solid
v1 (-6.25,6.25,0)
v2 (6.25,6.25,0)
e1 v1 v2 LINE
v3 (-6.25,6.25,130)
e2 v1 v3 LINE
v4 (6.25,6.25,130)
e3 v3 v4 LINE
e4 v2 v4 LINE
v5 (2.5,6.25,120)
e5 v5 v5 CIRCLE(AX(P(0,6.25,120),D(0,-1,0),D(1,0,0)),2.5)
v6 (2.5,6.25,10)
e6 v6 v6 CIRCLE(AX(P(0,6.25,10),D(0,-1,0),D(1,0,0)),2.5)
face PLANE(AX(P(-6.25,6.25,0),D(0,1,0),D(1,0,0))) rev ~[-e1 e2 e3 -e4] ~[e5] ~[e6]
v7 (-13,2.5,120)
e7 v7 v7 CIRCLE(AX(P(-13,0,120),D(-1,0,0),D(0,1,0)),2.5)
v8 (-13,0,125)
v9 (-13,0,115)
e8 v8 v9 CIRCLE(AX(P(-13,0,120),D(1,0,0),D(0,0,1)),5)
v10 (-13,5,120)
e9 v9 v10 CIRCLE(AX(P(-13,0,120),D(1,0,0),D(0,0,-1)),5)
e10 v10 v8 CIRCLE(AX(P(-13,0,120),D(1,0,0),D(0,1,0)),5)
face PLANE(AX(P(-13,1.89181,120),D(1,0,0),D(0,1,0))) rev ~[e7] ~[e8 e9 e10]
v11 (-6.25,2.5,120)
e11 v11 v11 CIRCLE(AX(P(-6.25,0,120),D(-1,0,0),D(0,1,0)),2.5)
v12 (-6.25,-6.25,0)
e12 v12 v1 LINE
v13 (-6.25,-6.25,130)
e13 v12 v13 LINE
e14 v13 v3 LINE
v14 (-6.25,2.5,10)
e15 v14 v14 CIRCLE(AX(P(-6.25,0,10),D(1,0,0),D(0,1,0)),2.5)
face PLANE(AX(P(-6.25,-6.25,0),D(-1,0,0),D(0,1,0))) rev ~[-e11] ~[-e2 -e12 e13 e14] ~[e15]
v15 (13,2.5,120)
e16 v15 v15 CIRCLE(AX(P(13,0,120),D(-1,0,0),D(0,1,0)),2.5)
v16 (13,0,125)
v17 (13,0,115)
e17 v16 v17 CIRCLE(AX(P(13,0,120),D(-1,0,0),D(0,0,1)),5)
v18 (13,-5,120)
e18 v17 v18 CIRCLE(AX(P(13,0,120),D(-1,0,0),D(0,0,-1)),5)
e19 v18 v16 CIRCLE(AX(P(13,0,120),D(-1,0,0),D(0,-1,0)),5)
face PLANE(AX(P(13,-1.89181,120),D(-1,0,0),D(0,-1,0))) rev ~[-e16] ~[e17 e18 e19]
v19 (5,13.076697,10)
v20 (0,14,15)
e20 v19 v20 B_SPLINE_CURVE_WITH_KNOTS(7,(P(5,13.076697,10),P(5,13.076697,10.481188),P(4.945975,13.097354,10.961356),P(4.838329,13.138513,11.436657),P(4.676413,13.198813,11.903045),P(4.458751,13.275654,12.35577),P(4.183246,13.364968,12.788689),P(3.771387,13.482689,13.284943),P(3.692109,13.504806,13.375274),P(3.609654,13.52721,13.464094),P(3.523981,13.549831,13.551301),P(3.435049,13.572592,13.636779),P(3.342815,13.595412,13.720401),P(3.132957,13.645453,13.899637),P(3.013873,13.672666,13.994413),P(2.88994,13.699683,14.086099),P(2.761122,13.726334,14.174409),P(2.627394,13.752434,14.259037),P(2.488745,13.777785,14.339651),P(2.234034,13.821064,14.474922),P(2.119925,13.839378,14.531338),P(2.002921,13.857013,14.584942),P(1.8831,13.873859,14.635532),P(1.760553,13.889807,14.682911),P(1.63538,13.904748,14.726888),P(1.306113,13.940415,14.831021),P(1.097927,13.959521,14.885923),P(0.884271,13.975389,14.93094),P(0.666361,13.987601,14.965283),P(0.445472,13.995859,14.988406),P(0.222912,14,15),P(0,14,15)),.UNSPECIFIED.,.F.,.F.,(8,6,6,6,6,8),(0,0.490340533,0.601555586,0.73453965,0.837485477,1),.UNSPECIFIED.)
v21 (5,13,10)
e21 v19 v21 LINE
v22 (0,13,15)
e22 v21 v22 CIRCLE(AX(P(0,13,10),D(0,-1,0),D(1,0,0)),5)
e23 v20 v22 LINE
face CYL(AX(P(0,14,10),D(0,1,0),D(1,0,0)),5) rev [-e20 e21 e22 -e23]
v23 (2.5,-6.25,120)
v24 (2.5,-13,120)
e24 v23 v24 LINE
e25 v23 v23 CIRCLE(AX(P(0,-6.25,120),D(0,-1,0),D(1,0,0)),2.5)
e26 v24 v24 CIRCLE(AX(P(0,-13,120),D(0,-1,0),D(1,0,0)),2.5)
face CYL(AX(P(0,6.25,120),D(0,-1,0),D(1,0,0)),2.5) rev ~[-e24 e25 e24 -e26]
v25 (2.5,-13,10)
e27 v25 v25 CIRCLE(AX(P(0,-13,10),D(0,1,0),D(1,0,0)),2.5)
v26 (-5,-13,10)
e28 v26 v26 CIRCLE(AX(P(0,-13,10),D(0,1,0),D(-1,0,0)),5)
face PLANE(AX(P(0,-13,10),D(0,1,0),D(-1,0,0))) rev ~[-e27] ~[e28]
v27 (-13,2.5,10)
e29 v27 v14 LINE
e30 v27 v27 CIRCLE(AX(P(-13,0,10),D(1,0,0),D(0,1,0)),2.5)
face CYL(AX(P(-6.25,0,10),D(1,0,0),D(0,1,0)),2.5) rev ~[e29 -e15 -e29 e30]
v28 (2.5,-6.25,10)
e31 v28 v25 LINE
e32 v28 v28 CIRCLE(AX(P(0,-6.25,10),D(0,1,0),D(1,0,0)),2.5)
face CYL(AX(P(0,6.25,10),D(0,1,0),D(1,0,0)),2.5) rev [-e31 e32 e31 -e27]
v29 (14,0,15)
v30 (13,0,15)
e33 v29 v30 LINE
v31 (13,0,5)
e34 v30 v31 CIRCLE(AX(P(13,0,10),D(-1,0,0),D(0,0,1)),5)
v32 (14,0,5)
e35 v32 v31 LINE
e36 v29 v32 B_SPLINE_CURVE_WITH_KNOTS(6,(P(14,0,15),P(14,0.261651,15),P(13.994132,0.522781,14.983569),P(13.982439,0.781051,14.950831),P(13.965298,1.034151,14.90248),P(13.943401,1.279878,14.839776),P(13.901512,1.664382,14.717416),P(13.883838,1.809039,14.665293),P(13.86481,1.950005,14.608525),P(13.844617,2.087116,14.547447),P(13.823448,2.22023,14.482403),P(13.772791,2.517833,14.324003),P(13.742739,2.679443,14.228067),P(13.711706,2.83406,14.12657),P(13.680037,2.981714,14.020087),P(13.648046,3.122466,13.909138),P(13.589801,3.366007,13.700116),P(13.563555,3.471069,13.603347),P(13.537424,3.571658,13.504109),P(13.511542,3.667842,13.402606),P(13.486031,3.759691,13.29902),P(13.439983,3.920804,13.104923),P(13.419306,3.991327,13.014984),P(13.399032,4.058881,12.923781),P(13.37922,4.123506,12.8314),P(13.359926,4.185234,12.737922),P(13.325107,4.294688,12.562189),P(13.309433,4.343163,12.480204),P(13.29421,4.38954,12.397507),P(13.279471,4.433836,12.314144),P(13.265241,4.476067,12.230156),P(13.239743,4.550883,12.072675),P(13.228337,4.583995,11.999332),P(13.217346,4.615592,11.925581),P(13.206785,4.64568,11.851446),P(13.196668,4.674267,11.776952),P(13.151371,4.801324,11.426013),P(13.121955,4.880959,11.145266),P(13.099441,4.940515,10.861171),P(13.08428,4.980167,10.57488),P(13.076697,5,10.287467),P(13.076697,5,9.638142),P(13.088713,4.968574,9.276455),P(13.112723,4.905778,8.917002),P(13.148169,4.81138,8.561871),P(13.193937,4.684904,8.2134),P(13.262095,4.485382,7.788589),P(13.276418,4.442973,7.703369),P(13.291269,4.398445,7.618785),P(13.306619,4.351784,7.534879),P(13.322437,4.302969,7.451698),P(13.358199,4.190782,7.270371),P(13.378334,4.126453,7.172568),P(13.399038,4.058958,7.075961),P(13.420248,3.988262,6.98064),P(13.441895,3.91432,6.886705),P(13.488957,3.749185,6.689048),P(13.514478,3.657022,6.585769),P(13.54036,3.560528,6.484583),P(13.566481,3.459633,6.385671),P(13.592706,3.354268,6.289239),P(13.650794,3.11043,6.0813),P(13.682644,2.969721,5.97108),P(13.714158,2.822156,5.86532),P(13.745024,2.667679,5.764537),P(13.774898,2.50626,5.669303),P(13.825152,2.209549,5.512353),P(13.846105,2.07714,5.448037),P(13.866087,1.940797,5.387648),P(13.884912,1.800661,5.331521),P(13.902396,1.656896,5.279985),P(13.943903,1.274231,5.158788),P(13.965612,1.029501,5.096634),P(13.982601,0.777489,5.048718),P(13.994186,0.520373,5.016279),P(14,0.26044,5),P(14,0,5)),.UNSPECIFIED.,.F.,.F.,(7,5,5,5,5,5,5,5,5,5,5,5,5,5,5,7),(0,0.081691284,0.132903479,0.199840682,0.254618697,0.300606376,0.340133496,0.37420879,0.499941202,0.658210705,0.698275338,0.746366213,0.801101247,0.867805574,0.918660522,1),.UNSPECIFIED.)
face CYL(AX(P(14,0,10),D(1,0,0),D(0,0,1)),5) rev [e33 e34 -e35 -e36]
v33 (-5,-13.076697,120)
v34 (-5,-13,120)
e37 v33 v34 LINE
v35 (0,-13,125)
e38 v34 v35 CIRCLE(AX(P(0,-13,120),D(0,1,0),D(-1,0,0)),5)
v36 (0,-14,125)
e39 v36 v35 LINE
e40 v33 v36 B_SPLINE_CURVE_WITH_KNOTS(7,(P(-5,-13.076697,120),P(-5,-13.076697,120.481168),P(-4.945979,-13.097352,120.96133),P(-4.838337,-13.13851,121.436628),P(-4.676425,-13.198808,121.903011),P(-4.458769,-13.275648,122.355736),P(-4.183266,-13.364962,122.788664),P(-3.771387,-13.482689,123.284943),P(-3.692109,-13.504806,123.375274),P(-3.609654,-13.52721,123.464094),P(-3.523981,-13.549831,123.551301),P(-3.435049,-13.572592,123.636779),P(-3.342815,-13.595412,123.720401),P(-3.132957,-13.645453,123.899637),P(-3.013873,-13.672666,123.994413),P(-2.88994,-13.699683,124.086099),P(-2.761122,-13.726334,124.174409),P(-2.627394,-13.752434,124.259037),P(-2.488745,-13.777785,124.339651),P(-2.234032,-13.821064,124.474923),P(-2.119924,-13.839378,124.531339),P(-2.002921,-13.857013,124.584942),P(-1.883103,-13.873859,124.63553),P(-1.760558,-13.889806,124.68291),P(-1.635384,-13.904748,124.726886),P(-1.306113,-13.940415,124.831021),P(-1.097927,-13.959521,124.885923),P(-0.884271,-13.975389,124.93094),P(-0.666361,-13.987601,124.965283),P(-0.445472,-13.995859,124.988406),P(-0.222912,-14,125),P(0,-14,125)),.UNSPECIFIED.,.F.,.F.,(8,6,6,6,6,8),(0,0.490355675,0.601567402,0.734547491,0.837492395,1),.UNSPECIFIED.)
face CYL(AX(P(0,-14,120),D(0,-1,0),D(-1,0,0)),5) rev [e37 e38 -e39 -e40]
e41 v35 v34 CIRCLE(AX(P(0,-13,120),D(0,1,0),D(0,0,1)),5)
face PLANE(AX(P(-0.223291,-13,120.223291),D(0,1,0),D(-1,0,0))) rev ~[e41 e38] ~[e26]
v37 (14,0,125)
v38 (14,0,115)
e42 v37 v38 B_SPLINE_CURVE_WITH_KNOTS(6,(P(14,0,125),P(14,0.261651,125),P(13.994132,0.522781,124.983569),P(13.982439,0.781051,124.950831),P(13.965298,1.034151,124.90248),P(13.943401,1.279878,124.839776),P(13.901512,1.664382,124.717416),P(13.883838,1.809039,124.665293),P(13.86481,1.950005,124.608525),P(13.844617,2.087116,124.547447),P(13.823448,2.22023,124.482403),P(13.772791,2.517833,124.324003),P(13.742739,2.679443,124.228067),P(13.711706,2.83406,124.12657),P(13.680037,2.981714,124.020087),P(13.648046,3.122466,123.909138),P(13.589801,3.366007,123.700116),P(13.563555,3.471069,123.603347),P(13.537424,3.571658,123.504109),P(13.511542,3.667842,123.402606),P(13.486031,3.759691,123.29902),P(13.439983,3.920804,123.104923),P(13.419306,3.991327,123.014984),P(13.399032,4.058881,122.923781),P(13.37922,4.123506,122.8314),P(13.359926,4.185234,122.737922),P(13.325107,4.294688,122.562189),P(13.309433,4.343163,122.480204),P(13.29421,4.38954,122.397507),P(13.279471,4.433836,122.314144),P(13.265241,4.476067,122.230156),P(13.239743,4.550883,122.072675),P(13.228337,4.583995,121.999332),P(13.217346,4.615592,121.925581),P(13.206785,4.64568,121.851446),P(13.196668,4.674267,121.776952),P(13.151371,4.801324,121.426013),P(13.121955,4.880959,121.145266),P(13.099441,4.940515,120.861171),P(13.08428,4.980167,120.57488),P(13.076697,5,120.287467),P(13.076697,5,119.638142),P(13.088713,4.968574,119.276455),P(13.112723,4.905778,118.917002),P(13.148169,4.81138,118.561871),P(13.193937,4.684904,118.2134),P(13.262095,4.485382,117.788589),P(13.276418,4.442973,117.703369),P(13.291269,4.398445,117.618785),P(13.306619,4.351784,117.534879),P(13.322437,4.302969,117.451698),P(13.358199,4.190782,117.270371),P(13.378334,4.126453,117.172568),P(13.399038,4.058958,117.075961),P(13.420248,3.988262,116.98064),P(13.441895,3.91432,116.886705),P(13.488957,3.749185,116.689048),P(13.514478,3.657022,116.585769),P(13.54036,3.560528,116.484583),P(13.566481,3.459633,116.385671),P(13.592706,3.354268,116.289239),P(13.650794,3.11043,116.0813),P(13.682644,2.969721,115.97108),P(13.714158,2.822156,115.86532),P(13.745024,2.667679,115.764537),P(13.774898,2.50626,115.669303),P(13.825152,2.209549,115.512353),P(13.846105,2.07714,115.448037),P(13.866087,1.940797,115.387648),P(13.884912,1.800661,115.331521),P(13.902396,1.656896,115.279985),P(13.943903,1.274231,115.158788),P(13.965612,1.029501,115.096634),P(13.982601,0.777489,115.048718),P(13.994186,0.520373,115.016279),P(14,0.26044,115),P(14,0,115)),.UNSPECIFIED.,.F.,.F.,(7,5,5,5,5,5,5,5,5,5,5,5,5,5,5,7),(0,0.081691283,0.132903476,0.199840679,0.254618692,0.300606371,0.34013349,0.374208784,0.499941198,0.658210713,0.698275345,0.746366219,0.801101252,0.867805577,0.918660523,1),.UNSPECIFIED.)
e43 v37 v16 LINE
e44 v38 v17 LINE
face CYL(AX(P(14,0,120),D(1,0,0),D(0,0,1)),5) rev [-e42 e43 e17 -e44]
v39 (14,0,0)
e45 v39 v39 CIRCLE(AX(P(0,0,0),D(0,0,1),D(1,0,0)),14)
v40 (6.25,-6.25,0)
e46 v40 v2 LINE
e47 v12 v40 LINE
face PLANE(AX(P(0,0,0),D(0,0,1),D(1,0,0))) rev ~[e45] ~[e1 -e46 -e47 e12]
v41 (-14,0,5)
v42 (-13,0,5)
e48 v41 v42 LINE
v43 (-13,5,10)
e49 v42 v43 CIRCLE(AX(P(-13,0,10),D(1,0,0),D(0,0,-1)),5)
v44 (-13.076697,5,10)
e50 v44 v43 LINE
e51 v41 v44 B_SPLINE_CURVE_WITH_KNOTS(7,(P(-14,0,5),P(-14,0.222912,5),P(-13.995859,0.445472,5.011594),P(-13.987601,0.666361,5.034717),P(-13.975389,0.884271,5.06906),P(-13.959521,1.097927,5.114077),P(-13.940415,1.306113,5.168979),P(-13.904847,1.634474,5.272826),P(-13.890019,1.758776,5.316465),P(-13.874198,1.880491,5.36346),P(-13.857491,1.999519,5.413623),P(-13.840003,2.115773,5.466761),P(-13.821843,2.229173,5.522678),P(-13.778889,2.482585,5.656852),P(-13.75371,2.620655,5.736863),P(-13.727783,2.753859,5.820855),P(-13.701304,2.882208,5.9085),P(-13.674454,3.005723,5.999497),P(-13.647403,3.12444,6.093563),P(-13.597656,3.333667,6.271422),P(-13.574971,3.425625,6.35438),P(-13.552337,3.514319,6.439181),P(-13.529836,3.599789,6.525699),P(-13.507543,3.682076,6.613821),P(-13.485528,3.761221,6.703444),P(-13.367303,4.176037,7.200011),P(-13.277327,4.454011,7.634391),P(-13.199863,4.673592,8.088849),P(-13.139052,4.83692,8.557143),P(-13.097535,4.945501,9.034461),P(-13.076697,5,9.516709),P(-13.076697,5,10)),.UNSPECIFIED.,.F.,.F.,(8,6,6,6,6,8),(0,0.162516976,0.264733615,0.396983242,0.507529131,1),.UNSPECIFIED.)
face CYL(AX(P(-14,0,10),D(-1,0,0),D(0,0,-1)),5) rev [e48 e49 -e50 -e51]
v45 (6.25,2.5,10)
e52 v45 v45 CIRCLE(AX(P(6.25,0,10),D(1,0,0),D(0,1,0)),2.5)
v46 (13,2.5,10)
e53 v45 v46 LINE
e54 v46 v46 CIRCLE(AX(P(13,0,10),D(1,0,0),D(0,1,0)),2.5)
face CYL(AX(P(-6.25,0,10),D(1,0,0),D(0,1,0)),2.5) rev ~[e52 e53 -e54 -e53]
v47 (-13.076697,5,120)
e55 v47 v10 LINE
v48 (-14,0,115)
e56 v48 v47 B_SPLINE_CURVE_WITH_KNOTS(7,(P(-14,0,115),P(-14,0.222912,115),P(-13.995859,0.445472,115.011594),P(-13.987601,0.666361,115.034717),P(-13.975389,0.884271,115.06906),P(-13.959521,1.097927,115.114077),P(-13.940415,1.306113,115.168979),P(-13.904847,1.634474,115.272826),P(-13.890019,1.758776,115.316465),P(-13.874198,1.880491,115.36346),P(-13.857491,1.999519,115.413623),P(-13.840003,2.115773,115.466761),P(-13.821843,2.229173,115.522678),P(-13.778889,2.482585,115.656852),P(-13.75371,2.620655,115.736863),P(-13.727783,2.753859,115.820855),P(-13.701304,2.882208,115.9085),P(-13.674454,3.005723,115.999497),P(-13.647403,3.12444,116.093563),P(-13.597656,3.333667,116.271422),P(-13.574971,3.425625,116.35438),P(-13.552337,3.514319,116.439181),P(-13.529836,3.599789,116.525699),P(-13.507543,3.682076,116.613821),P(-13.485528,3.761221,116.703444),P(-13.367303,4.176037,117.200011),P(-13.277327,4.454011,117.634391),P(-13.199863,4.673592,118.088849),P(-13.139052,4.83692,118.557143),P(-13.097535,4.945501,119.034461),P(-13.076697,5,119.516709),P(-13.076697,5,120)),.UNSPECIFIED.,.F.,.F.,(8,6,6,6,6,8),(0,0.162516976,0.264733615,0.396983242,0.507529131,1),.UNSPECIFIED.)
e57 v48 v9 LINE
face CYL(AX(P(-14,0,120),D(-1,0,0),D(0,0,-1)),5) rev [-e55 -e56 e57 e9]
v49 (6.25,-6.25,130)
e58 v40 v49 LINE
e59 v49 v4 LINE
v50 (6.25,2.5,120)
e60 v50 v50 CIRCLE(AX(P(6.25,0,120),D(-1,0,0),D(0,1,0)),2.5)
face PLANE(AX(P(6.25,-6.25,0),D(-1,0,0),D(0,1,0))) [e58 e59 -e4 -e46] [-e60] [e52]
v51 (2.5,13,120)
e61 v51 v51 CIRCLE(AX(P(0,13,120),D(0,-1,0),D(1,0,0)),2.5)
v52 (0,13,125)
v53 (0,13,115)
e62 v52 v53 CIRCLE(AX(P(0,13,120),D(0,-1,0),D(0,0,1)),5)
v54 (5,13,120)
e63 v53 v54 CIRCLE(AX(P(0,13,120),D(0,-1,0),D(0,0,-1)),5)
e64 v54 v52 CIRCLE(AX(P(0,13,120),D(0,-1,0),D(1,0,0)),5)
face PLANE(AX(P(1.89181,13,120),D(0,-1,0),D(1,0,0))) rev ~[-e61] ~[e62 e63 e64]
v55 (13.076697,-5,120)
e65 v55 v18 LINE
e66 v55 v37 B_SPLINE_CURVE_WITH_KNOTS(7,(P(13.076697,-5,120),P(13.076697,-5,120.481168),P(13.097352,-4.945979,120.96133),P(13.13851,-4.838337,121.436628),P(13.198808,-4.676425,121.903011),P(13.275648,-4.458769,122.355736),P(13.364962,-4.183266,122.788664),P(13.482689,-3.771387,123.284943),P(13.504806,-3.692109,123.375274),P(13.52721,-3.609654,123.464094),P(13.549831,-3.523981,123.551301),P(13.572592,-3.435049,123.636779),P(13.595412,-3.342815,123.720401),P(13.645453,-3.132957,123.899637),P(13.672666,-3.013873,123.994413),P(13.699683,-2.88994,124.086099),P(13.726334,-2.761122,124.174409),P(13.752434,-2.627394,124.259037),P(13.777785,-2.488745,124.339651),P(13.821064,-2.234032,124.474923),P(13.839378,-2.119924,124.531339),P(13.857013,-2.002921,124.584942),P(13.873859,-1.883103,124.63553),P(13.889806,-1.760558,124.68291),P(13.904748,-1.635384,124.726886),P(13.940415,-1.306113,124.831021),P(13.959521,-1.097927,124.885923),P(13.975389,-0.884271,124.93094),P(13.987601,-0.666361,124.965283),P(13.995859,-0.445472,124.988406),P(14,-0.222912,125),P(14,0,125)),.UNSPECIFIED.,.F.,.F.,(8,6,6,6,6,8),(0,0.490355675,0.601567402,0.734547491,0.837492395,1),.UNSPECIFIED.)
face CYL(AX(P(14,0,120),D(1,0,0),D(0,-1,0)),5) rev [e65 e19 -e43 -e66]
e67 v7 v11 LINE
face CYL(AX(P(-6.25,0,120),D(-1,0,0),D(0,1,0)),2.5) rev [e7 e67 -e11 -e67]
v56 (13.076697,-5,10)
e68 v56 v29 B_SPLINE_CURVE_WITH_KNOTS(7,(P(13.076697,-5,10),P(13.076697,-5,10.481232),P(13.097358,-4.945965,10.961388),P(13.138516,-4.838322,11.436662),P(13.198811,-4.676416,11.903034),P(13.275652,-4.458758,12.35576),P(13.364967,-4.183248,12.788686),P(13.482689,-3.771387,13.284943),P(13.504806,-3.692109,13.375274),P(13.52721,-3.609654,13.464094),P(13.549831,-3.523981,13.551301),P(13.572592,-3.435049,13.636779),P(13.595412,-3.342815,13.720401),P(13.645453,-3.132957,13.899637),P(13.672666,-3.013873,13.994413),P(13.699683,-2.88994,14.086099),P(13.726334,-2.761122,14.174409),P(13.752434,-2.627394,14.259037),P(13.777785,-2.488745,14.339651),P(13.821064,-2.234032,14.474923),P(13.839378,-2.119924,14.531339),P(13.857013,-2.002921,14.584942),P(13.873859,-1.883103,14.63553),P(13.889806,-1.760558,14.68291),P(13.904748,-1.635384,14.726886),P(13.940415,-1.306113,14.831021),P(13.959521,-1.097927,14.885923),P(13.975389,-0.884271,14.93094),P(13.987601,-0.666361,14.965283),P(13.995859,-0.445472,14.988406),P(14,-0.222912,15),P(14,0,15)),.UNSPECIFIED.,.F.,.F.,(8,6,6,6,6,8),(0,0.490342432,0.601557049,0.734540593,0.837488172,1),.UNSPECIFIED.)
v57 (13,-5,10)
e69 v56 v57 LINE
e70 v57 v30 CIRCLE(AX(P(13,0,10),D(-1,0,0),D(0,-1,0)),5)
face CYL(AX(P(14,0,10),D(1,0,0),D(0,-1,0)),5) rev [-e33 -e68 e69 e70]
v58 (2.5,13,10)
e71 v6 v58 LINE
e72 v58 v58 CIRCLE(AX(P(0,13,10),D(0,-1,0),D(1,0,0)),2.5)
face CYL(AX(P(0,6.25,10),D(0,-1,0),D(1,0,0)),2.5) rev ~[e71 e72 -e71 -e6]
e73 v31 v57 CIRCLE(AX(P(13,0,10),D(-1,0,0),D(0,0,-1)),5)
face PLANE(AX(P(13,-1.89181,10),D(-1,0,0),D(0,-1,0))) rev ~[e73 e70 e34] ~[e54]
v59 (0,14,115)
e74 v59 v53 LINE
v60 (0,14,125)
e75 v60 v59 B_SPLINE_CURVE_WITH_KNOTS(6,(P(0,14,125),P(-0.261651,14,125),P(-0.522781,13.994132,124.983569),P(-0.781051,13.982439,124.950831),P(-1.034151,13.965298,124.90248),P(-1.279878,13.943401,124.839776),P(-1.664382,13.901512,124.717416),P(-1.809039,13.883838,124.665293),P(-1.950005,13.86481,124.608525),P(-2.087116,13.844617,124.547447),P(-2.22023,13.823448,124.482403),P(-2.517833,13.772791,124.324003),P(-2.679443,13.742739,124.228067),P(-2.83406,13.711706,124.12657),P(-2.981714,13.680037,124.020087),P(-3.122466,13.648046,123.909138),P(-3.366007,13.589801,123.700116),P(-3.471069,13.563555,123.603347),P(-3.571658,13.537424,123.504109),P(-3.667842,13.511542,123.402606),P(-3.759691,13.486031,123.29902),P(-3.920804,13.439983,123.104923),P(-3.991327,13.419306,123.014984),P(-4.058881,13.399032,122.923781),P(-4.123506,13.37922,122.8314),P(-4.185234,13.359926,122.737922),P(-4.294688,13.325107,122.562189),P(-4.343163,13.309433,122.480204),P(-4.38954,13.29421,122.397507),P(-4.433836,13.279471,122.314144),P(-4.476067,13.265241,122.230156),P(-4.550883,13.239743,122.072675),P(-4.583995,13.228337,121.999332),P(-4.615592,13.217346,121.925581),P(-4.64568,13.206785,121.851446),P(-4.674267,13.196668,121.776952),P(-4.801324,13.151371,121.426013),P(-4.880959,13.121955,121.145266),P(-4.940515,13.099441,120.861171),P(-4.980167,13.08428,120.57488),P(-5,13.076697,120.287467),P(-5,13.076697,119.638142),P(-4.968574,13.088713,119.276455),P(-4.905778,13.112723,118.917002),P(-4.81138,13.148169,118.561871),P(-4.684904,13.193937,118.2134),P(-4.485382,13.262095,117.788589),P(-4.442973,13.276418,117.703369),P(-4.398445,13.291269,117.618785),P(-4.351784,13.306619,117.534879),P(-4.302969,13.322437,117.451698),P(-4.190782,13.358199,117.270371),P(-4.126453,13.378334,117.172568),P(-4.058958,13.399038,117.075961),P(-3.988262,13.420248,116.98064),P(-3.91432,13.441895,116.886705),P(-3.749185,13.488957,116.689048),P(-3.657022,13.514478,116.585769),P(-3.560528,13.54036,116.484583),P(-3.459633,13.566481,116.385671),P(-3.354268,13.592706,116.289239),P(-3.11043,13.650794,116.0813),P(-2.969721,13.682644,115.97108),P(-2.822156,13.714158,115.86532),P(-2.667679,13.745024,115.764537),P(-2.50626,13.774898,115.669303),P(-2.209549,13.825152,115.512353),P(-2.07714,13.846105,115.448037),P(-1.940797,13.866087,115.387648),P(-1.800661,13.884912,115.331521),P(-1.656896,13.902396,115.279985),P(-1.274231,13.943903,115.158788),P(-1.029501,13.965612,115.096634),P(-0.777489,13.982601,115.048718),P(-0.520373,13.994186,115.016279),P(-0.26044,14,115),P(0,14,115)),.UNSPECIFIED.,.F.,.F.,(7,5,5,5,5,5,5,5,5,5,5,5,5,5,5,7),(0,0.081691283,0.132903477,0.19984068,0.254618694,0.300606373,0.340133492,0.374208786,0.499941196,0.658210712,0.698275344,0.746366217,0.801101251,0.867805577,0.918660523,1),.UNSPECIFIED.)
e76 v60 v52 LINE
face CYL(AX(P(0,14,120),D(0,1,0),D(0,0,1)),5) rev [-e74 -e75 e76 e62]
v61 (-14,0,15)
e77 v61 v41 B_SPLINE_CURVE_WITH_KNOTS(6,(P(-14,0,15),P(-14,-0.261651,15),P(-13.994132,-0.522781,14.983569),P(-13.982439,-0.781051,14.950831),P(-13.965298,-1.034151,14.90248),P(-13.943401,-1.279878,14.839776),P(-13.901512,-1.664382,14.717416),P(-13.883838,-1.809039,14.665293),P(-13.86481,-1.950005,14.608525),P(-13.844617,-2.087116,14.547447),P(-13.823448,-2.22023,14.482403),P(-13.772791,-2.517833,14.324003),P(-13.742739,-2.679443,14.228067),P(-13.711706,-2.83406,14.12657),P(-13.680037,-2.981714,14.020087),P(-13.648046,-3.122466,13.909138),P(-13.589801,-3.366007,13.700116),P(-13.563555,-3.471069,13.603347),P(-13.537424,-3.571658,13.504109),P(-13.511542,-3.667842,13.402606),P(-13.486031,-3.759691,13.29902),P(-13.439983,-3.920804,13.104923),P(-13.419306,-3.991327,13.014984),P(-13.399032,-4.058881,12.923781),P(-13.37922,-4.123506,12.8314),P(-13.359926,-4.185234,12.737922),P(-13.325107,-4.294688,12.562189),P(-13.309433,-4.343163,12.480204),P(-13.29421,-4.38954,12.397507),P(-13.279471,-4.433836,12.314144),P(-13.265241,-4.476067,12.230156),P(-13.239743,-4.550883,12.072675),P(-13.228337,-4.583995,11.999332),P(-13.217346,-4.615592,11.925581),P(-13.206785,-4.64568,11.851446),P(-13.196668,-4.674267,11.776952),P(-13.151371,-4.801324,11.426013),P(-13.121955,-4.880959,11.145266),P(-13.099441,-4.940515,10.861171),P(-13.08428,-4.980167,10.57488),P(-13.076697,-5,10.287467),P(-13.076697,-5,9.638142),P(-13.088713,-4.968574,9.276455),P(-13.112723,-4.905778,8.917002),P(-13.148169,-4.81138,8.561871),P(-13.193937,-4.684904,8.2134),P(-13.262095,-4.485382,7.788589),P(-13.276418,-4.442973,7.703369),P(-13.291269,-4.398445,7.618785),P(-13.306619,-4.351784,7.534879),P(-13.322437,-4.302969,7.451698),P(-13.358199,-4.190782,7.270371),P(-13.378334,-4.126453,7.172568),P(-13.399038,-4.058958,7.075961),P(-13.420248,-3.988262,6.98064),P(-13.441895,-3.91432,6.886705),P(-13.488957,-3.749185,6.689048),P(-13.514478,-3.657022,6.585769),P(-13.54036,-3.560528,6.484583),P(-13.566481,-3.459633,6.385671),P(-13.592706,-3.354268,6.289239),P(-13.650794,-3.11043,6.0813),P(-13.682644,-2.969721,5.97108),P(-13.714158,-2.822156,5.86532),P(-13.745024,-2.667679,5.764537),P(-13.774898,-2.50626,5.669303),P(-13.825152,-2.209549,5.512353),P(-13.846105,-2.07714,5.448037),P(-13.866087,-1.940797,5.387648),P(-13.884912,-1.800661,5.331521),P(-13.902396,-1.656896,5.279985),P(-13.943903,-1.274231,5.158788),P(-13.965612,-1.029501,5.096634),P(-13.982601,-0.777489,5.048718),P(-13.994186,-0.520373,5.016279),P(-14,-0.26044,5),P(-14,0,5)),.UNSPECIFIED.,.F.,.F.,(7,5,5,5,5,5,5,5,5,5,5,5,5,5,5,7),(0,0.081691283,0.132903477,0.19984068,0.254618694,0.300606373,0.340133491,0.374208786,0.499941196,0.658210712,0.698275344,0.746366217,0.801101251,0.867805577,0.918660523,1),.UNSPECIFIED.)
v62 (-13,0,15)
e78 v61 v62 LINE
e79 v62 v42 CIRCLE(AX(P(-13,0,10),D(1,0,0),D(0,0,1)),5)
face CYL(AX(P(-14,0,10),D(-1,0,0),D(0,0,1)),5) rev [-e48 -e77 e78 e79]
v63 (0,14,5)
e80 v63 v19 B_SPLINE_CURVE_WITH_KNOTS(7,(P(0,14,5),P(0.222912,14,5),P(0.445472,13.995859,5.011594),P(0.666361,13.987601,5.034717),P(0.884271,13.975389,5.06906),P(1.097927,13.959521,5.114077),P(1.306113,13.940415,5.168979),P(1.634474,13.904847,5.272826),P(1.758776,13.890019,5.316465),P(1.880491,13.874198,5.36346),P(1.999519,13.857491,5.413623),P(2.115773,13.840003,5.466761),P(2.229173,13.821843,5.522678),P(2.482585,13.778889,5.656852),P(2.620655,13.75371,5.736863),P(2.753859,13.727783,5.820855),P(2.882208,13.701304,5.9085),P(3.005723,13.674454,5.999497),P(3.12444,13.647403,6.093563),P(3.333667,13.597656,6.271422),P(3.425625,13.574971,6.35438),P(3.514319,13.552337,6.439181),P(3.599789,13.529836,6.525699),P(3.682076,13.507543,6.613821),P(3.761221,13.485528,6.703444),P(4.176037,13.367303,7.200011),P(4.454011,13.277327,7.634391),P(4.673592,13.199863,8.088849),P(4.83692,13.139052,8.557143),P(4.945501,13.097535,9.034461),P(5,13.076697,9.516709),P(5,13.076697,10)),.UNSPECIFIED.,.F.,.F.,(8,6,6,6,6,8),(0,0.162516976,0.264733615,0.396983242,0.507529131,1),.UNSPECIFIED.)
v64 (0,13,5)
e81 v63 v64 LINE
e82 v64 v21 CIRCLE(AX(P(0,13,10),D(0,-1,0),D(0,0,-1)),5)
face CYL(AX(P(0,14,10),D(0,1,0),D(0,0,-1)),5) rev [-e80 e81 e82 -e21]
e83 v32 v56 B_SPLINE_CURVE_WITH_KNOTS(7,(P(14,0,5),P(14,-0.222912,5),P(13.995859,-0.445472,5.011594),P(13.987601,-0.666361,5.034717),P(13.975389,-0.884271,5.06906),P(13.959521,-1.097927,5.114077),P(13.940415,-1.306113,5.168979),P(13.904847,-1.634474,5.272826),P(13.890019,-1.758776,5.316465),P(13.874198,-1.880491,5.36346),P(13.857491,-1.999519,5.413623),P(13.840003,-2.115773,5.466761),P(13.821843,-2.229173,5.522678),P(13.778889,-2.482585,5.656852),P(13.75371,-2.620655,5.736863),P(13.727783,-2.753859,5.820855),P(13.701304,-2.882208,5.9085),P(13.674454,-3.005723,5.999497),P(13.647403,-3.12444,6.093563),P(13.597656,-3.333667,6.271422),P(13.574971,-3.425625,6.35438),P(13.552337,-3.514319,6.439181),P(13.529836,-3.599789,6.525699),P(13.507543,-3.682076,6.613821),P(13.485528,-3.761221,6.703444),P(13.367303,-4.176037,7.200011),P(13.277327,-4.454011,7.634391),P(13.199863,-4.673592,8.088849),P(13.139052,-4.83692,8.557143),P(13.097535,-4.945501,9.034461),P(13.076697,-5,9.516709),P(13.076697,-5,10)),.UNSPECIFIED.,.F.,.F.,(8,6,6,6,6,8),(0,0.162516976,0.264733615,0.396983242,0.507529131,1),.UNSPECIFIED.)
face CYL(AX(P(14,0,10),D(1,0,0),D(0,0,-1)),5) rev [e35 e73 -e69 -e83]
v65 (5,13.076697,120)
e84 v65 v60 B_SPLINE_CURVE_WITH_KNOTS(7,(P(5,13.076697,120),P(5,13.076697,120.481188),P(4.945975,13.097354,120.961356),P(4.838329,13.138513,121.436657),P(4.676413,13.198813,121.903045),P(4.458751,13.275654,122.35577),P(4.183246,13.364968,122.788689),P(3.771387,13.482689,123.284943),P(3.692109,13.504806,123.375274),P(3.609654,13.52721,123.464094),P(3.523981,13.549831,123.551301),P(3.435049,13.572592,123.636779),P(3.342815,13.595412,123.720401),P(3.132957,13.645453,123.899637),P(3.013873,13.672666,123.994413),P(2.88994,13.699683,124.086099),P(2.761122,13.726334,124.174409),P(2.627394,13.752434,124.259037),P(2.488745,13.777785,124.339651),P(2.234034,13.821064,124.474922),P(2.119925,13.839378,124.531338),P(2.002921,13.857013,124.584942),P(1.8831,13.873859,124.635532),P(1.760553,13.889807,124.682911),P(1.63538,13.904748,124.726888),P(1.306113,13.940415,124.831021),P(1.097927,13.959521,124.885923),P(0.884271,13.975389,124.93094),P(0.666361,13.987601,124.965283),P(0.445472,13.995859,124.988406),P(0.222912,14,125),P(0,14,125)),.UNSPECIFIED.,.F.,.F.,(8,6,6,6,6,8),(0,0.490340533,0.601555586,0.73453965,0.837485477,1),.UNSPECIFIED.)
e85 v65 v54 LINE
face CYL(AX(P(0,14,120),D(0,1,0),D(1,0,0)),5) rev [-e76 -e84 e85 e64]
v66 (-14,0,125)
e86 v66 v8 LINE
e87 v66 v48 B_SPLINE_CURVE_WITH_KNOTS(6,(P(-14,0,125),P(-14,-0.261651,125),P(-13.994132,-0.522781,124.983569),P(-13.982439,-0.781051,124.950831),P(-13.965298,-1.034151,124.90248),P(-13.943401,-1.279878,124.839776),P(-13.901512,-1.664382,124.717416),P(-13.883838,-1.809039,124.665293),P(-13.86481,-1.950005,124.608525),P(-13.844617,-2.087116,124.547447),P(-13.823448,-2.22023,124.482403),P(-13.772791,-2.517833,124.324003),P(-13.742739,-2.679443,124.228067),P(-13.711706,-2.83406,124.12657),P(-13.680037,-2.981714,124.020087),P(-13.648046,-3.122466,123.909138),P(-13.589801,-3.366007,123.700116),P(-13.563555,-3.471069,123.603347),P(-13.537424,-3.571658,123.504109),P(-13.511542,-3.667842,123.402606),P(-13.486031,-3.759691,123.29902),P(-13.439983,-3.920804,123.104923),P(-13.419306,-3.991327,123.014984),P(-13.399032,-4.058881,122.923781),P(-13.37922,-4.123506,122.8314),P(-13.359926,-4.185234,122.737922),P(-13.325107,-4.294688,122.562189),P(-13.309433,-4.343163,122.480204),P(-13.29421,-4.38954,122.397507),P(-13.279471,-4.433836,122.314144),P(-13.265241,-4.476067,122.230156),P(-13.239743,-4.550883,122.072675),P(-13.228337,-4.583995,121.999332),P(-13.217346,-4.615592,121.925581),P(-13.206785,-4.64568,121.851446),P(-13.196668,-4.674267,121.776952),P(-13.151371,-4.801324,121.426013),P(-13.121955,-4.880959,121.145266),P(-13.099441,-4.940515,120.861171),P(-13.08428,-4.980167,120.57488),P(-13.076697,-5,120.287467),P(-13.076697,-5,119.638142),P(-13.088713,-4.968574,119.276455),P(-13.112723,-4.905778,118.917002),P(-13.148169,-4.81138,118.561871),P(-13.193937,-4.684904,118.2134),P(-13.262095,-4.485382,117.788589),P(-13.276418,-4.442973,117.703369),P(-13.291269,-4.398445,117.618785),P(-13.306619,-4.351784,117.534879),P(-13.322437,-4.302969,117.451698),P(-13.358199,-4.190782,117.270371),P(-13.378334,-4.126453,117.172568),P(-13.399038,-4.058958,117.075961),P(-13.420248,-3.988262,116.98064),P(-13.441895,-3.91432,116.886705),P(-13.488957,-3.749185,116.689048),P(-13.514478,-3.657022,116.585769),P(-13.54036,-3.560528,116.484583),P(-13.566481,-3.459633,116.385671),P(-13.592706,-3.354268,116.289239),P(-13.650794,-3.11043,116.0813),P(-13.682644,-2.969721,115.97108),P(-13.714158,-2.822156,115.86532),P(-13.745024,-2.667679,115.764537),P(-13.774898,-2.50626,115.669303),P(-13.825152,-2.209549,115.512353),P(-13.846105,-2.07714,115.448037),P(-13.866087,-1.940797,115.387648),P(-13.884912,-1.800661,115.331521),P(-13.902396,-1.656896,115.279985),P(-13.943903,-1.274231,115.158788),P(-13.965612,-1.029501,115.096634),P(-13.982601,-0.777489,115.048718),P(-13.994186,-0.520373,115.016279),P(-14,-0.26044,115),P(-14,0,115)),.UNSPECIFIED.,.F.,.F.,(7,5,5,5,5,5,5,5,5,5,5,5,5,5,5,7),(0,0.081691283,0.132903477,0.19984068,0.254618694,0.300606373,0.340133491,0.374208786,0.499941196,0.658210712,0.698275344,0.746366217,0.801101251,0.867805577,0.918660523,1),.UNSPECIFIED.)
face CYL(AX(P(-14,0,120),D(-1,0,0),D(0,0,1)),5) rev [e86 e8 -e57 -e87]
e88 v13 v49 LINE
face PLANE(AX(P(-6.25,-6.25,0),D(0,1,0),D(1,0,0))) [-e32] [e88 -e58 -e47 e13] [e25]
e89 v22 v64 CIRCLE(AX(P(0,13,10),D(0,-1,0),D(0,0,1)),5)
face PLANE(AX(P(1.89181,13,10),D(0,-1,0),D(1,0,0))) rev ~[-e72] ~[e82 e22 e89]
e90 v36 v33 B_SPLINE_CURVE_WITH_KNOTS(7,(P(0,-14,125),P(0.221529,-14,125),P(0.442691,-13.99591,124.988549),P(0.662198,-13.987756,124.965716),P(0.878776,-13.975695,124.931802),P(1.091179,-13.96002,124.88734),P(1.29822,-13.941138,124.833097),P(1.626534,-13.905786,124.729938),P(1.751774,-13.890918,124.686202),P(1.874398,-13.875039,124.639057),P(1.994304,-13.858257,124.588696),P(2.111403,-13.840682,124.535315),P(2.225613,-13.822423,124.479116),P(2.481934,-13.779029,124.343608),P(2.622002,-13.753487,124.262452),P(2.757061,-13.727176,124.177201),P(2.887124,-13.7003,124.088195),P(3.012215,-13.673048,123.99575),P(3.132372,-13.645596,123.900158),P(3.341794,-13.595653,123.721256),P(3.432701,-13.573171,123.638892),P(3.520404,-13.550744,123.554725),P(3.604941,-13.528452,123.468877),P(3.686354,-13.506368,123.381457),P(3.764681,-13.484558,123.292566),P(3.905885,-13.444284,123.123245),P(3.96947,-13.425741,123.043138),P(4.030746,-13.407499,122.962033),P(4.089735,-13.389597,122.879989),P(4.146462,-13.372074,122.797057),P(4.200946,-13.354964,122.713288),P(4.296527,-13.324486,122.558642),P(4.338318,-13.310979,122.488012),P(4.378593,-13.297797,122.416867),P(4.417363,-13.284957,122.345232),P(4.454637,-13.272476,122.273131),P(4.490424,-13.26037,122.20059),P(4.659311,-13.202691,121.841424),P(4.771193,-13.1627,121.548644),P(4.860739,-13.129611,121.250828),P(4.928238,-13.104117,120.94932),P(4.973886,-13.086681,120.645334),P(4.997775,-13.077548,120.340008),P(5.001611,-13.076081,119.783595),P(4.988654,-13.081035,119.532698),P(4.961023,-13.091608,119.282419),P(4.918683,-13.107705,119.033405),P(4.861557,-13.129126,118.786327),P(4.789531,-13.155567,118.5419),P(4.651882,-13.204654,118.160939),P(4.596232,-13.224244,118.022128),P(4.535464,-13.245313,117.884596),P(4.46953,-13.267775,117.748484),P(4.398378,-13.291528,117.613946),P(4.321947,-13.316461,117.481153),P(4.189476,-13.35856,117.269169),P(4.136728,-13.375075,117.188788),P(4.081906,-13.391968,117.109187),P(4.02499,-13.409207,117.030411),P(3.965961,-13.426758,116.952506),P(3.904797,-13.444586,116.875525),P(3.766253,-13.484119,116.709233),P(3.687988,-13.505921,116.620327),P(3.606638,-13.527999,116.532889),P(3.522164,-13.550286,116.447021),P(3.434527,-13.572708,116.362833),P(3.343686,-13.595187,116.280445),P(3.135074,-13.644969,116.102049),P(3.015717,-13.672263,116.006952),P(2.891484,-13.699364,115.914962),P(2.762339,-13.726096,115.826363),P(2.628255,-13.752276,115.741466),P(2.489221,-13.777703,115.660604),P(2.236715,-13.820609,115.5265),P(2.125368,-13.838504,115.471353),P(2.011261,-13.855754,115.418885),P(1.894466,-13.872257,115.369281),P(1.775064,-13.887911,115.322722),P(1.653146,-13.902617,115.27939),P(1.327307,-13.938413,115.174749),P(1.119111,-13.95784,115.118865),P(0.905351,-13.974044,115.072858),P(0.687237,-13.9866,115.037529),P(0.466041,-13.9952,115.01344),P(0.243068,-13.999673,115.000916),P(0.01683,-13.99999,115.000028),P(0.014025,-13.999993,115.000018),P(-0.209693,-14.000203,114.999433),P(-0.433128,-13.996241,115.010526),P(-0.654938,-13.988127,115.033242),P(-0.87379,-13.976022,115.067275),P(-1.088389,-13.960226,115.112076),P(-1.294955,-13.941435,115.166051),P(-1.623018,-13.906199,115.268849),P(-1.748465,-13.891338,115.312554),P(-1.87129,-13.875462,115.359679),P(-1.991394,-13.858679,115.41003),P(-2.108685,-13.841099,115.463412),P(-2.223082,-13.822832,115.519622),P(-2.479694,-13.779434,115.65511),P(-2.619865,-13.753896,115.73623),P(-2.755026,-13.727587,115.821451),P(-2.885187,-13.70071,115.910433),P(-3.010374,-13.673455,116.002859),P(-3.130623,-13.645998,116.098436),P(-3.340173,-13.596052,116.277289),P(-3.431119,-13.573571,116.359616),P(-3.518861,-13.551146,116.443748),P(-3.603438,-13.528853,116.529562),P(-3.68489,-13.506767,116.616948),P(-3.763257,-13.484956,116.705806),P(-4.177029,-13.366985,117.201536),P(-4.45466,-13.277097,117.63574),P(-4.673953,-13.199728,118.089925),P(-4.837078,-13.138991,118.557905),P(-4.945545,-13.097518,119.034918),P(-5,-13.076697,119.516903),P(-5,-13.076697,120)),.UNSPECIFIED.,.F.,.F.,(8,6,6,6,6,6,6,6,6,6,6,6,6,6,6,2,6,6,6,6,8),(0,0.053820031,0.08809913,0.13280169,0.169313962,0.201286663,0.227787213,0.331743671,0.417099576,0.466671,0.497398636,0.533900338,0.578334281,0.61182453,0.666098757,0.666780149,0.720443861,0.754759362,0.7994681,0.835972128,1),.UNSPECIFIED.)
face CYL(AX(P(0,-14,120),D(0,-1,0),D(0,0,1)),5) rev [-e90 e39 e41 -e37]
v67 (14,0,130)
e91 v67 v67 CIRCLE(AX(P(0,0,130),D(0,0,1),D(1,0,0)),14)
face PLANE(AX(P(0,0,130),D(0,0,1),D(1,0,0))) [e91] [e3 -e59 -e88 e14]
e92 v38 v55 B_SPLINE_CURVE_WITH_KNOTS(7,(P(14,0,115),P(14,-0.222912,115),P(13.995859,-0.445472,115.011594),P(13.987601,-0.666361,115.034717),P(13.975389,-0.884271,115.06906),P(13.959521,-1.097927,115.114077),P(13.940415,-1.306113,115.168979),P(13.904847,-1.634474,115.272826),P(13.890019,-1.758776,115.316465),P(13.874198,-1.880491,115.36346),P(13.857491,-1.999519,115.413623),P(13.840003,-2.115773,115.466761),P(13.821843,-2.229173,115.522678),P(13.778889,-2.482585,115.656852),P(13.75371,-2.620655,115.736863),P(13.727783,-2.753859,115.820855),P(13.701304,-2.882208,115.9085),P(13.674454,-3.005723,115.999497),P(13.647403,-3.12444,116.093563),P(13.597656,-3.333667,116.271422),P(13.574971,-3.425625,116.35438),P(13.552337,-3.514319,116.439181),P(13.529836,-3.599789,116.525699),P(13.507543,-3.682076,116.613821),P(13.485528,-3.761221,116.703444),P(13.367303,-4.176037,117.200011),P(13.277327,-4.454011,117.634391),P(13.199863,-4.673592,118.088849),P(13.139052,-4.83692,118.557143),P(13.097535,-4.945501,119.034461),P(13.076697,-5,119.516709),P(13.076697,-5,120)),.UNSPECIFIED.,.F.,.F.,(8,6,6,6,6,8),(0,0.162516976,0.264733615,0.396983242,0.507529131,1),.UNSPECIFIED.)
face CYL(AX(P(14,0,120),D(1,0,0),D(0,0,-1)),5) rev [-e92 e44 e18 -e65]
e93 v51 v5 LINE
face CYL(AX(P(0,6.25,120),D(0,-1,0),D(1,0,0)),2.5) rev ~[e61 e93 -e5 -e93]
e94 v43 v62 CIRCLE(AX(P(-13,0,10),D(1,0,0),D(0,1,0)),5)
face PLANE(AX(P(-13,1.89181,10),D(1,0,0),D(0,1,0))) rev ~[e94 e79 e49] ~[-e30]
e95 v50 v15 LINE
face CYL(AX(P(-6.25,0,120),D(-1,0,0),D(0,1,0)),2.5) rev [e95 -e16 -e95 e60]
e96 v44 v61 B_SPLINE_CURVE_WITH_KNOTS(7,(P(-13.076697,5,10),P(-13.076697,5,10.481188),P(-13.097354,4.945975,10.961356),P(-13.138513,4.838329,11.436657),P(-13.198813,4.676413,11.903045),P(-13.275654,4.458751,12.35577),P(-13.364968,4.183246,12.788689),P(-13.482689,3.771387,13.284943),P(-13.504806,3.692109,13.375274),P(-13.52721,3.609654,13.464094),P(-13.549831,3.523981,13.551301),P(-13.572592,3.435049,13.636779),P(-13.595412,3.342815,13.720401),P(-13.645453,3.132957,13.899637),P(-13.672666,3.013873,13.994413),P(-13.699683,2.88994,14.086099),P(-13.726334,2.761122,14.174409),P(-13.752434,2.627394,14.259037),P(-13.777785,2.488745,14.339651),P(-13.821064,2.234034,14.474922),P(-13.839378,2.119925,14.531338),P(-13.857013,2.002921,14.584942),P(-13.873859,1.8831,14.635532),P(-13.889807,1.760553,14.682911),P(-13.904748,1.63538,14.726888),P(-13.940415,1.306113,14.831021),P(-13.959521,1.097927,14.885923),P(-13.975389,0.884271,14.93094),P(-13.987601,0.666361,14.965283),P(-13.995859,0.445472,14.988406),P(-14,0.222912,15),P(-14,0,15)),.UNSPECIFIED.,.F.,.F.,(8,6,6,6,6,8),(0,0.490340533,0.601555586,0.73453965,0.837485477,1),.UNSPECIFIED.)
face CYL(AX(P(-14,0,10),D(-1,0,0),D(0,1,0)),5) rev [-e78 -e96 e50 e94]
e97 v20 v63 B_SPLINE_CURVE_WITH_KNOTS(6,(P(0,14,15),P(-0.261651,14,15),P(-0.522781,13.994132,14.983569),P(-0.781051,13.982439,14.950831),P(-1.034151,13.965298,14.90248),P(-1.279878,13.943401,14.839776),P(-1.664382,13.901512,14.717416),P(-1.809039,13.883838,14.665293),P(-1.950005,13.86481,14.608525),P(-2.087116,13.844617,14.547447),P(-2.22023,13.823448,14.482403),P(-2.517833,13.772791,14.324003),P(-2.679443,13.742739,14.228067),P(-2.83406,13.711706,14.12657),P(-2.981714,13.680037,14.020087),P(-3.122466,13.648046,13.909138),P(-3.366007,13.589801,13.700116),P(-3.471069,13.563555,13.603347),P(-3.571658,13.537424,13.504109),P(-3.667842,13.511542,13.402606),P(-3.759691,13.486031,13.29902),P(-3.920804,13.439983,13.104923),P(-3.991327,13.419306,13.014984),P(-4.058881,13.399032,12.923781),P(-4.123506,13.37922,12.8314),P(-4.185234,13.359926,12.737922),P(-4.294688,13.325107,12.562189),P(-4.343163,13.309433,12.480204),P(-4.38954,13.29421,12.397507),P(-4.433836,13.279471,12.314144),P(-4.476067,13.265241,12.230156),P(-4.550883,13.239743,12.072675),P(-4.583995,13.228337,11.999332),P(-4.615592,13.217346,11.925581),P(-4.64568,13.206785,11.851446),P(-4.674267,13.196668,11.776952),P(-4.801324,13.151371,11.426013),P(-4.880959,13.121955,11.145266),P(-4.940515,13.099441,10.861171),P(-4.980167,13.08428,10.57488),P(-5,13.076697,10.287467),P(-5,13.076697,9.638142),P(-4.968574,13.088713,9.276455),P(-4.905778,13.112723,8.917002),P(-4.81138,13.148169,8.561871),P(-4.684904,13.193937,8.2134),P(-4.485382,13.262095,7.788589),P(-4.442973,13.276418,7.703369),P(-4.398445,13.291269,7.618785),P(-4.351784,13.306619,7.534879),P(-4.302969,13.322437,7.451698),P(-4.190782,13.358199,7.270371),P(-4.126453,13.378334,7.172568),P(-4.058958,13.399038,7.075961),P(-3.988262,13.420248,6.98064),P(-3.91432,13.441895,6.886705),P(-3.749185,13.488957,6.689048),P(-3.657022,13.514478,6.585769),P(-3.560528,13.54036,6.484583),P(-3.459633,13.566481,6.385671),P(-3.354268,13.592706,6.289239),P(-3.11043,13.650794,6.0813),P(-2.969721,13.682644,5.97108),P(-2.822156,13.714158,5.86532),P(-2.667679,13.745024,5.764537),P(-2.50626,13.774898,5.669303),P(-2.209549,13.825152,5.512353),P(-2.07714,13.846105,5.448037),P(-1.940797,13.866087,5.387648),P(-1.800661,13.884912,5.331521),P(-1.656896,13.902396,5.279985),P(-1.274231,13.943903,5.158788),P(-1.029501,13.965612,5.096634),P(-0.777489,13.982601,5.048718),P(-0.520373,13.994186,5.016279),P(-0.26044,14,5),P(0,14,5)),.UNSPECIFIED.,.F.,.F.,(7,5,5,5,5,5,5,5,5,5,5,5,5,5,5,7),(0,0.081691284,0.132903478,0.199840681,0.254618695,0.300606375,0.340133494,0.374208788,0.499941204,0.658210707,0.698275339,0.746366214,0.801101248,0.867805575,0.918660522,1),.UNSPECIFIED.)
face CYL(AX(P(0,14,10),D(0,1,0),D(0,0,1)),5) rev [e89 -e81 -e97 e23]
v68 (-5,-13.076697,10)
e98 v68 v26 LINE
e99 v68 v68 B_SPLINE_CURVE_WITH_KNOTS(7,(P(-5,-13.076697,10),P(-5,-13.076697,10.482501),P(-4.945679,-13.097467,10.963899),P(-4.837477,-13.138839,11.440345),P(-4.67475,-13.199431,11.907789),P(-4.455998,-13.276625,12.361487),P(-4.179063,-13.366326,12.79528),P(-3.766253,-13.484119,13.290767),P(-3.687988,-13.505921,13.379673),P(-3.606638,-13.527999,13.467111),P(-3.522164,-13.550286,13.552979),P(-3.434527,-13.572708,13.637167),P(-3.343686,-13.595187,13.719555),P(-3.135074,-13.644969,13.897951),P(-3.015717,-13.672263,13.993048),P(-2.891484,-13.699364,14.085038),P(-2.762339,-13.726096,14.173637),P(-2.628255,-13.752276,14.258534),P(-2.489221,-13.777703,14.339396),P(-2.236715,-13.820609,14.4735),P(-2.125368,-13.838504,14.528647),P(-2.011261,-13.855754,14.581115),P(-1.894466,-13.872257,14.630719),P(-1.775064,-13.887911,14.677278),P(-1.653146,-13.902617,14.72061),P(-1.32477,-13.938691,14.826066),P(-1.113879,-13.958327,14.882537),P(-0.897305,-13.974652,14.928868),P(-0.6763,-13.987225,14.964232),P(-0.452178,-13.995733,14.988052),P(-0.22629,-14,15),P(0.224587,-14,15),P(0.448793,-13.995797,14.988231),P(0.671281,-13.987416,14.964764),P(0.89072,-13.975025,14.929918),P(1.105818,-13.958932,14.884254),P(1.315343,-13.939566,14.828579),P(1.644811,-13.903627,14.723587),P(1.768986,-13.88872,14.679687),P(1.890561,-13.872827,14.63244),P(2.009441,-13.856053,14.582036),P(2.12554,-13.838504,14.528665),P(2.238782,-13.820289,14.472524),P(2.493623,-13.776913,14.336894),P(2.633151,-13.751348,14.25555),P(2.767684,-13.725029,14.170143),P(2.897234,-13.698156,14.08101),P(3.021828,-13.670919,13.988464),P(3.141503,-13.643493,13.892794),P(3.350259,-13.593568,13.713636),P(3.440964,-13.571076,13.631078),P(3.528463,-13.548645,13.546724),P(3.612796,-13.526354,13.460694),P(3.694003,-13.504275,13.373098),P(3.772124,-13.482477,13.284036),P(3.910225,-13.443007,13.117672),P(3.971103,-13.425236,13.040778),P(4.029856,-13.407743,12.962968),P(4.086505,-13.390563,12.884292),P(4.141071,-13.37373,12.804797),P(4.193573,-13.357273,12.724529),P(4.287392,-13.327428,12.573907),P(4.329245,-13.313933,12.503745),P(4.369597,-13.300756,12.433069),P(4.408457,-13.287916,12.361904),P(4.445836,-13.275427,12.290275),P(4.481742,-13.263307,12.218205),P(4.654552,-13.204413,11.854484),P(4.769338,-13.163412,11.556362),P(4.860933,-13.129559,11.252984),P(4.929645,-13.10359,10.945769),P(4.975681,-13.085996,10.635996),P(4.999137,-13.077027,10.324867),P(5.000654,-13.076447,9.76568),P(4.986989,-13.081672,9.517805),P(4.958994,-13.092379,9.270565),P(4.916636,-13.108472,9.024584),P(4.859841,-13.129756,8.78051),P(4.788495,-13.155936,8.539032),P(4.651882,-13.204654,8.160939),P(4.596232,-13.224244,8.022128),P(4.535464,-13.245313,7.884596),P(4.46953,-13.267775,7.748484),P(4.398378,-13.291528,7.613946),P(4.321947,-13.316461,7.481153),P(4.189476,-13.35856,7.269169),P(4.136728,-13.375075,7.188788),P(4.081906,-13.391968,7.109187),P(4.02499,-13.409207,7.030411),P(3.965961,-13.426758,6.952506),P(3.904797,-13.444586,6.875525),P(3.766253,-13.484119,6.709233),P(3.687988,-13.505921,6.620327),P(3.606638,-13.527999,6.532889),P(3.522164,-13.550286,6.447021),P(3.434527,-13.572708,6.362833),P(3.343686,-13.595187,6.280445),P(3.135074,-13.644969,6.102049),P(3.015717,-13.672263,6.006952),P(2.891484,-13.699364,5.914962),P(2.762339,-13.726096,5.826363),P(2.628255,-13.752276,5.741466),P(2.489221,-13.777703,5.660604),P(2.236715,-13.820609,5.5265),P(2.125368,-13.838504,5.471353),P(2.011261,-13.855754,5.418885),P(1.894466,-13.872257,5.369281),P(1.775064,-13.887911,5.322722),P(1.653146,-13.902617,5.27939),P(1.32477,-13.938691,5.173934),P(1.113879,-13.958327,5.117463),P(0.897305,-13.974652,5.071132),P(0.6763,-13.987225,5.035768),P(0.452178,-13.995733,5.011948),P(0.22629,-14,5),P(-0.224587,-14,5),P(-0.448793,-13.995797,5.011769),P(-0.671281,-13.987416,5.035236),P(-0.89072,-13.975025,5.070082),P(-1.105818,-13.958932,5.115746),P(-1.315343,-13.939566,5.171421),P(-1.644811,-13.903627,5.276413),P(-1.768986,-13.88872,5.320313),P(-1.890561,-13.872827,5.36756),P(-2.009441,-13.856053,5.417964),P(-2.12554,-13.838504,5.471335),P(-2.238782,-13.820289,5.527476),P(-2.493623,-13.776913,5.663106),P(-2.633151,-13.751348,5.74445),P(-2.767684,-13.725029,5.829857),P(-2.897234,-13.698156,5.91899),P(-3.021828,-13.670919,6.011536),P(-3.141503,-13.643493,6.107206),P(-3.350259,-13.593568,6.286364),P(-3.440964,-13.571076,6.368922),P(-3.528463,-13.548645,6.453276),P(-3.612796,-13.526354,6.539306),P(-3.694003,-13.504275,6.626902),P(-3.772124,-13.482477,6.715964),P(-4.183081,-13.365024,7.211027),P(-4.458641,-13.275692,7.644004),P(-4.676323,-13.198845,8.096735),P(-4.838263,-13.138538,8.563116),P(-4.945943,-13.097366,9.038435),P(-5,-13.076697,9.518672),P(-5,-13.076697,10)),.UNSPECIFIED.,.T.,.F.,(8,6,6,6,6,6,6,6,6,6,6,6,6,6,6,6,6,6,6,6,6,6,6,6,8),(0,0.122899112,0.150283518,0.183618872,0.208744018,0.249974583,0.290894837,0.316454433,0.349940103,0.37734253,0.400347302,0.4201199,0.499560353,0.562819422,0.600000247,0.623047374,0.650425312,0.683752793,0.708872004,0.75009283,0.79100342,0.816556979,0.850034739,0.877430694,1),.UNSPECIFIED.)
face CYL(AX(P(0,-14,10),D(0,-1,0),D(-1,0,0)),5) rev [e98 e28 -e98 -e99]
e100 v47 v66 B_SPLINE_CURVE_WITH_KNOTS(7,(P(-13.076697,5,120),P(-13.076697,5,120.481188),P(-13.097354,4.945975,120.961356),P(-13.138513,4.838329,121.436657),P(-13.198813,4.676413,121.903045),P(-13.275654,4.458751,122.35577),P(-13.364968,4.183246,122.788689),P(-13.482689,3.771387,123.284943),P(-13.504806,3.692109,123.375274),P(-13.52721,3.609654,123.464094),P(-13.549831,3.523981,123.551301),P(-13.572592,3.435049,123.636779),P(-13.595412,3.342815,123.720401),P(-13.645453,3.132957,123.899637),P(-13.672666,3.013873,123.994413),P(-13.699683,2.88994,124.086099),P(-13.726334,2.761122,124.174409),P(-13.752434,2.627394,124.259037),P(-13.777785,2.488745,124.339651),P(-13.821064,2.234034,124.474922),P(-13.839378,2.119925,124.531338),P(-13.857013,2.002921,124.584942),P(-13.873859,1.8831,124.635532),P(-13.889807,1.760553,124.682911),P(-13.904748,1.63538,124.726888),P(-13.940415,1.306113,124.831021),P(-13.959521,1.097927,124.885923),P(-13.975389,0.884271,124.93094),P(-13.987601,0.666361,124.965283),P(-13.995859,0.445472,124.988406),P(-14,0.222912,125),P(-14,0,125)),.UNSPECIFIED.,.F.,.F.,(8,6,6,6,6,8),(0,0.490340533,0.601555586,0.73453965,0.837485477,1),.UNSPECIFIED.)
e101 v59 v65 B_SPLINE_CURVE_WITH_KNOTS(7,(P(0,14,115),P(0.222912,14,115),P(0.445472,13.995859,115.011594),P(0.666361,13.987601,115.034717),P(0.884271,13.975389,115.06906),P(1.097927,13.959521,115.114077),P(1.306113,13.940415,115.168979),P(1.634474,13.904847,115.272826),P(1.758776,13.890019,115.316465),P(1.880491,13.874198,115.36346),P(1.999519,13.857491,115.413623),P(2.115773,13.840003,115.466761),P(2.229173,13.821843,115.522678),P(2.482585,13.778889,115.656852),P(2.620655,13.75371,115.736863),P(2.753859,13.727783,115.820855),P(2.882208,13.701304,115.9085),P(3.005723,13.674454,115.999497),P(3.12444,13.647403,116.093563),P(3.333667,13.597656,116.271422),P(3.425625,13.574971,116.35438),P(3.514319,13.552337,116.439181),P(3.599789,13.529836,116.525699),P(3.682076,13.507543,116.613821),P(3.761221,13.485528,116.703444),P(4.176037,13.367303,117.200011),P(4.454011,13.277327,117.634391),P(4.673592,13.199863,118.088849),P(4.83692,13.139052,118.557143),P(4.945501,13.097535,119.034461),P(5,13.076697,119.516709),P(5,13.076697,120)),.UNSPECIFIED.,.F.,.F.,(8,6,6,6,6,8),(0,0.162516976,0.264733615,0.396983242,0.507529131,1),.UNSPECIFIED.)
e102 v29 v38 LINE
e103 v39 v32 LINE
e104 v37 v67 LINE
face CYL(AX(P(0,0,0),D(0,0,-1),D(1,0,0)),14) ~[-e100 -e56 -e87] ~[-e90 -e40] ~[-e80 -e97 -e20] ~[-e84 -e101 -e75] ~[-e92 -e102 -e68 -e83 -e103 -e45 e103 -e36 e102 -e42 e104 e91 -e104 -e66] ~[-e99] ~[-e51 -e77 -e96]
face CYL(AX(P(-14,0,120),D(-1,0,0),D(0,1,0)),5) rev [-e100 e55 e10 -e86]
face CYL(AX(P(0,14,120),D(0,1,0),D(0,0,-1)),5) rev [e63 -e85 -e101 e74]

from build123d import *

# Parameters (mm, degrees)
F0_R            = 14
F0_W            = 12.5
F0_H            = 12.5
F1_DEPTH        = 130
F2_R            = 2.5
F4_DEPTH        = 25
F3_R            = 2.5
F5_DEPTH        = 25
F9_DEPTH        = 1
F9_COPIES_COUNT = 3
F9_COPIES_ANGLE = 180
F12_R           = 5
F13_DEPTH       = 1


# Not quite as in the source:
# - a pattern or mirror of a feature is missing from the dataset's text; its kind, count and spacing are read off the source's solid


with BuildPart() as f1:
    # F0 (on Top) → F1 (new body)
    with BuildSketch(Plane.XY):
        Circle(F0_R)
        Rectangle(F0_W, F0_H, mode=Mode.SUBTRACT)
    extrude(amount=F1_DEPTH)

    # F2 (on face) → F4 (cut, symmetric)
    with BuildSketch(Plane.XZ.offset(-6.25)):
        with Locations((0, 10)):
            Circle(F2_R)
        with Locations((0, 120)):
            Circle(F2_R)
    extrude(amount=F4_DEPTH, both=True, mode=Mode.SUBTRACT)

    # F3 (on face) → F5 (cut, symmetric)
    with BuildSketch(Plane.YZ.offset(-6.25)):
        with BuildLine():
            ThreePointArc((2.5, 120), (1.767766953, 121.767766953), (0, 122.5))
            ThreePointArc((0, 122.5), (-1.767766953, 118.232233047), (2.5, 120))
        make_face()
        with Locations((0, 10)):
            Circle(F3_R)
    extrude(amount=F5_DEPTH, both=True, mode=Mode.SUBTRACT)

    # F8 (on line) → F9 (cut)
    with BuildSketch(Plane(origin=(14, 0, 0), x_dir=(0, -1, 0), z_dir=(-1, 0, 0))):
        with BuildLine():
            ThreePointArc((5, 120), (3.5355339059, 123.5355339059), (0, 125))
            Line((0, 125), (0, 115))
            ThreePointArc((0, 115), (3.5355339059, 116.4644660941), (5, 120))
        make_face()
        with BuildLine():
            ThreePointArc((5, 10), (3.5355339059, 13.5355339059), (0, 15))
            Line((0, 15), (0, 5))
            ThreePointArc((0, 5), (3.5355339059, 6.4644660941), (5, 10))
        make_face()
        with BuildLine():
            Line((0, 5), (0, 15))
            ThreePointArc((0, 15), (-5, 10), (0, 5))
        make_face()
        with BuildLine():
            Line((0, 115), (0, 125))
            ThreePointArc((0, 125), (-5, 120), (0, 115))
        make_face()
    f9 = extrude(amount=F9_DEPTH, mode=Mode.SUBTRACT)

    # F9_copies: F9 ×3 about axis
    f9_copies_axis = Axis((0, 0, 0), (0, 0, 1))
    for i in range(1, F9_COPIES_COUNT):
        add(f9.rotate(f9_copies_axis, i * F9_COPIES_ANGLE / (F9_COPIES_COUNT - 1)), mode=Mode.SUBTRACT)

    # F12 (on line) → F13 (cut)
    with BuildSketch(Plane(origin=(0, -14, 0), x_dir=(-1, 0, 0), z_dir=(0, 1, 0))):
        with BuildLine():
            ThreePointArc((0, 125), (-3.5355339059, 116.4644660941), (5, 120))
            ThreePointArc((5, 120), (3.5355339059, 123.5355339059), (0, 125))
        make_face()
        with Locations((0, 10)):
            Circle(F12_R)
    extrude(amount=F13_DEPTH, mode=Mode.SUBTRACT)


solid = f1.part
